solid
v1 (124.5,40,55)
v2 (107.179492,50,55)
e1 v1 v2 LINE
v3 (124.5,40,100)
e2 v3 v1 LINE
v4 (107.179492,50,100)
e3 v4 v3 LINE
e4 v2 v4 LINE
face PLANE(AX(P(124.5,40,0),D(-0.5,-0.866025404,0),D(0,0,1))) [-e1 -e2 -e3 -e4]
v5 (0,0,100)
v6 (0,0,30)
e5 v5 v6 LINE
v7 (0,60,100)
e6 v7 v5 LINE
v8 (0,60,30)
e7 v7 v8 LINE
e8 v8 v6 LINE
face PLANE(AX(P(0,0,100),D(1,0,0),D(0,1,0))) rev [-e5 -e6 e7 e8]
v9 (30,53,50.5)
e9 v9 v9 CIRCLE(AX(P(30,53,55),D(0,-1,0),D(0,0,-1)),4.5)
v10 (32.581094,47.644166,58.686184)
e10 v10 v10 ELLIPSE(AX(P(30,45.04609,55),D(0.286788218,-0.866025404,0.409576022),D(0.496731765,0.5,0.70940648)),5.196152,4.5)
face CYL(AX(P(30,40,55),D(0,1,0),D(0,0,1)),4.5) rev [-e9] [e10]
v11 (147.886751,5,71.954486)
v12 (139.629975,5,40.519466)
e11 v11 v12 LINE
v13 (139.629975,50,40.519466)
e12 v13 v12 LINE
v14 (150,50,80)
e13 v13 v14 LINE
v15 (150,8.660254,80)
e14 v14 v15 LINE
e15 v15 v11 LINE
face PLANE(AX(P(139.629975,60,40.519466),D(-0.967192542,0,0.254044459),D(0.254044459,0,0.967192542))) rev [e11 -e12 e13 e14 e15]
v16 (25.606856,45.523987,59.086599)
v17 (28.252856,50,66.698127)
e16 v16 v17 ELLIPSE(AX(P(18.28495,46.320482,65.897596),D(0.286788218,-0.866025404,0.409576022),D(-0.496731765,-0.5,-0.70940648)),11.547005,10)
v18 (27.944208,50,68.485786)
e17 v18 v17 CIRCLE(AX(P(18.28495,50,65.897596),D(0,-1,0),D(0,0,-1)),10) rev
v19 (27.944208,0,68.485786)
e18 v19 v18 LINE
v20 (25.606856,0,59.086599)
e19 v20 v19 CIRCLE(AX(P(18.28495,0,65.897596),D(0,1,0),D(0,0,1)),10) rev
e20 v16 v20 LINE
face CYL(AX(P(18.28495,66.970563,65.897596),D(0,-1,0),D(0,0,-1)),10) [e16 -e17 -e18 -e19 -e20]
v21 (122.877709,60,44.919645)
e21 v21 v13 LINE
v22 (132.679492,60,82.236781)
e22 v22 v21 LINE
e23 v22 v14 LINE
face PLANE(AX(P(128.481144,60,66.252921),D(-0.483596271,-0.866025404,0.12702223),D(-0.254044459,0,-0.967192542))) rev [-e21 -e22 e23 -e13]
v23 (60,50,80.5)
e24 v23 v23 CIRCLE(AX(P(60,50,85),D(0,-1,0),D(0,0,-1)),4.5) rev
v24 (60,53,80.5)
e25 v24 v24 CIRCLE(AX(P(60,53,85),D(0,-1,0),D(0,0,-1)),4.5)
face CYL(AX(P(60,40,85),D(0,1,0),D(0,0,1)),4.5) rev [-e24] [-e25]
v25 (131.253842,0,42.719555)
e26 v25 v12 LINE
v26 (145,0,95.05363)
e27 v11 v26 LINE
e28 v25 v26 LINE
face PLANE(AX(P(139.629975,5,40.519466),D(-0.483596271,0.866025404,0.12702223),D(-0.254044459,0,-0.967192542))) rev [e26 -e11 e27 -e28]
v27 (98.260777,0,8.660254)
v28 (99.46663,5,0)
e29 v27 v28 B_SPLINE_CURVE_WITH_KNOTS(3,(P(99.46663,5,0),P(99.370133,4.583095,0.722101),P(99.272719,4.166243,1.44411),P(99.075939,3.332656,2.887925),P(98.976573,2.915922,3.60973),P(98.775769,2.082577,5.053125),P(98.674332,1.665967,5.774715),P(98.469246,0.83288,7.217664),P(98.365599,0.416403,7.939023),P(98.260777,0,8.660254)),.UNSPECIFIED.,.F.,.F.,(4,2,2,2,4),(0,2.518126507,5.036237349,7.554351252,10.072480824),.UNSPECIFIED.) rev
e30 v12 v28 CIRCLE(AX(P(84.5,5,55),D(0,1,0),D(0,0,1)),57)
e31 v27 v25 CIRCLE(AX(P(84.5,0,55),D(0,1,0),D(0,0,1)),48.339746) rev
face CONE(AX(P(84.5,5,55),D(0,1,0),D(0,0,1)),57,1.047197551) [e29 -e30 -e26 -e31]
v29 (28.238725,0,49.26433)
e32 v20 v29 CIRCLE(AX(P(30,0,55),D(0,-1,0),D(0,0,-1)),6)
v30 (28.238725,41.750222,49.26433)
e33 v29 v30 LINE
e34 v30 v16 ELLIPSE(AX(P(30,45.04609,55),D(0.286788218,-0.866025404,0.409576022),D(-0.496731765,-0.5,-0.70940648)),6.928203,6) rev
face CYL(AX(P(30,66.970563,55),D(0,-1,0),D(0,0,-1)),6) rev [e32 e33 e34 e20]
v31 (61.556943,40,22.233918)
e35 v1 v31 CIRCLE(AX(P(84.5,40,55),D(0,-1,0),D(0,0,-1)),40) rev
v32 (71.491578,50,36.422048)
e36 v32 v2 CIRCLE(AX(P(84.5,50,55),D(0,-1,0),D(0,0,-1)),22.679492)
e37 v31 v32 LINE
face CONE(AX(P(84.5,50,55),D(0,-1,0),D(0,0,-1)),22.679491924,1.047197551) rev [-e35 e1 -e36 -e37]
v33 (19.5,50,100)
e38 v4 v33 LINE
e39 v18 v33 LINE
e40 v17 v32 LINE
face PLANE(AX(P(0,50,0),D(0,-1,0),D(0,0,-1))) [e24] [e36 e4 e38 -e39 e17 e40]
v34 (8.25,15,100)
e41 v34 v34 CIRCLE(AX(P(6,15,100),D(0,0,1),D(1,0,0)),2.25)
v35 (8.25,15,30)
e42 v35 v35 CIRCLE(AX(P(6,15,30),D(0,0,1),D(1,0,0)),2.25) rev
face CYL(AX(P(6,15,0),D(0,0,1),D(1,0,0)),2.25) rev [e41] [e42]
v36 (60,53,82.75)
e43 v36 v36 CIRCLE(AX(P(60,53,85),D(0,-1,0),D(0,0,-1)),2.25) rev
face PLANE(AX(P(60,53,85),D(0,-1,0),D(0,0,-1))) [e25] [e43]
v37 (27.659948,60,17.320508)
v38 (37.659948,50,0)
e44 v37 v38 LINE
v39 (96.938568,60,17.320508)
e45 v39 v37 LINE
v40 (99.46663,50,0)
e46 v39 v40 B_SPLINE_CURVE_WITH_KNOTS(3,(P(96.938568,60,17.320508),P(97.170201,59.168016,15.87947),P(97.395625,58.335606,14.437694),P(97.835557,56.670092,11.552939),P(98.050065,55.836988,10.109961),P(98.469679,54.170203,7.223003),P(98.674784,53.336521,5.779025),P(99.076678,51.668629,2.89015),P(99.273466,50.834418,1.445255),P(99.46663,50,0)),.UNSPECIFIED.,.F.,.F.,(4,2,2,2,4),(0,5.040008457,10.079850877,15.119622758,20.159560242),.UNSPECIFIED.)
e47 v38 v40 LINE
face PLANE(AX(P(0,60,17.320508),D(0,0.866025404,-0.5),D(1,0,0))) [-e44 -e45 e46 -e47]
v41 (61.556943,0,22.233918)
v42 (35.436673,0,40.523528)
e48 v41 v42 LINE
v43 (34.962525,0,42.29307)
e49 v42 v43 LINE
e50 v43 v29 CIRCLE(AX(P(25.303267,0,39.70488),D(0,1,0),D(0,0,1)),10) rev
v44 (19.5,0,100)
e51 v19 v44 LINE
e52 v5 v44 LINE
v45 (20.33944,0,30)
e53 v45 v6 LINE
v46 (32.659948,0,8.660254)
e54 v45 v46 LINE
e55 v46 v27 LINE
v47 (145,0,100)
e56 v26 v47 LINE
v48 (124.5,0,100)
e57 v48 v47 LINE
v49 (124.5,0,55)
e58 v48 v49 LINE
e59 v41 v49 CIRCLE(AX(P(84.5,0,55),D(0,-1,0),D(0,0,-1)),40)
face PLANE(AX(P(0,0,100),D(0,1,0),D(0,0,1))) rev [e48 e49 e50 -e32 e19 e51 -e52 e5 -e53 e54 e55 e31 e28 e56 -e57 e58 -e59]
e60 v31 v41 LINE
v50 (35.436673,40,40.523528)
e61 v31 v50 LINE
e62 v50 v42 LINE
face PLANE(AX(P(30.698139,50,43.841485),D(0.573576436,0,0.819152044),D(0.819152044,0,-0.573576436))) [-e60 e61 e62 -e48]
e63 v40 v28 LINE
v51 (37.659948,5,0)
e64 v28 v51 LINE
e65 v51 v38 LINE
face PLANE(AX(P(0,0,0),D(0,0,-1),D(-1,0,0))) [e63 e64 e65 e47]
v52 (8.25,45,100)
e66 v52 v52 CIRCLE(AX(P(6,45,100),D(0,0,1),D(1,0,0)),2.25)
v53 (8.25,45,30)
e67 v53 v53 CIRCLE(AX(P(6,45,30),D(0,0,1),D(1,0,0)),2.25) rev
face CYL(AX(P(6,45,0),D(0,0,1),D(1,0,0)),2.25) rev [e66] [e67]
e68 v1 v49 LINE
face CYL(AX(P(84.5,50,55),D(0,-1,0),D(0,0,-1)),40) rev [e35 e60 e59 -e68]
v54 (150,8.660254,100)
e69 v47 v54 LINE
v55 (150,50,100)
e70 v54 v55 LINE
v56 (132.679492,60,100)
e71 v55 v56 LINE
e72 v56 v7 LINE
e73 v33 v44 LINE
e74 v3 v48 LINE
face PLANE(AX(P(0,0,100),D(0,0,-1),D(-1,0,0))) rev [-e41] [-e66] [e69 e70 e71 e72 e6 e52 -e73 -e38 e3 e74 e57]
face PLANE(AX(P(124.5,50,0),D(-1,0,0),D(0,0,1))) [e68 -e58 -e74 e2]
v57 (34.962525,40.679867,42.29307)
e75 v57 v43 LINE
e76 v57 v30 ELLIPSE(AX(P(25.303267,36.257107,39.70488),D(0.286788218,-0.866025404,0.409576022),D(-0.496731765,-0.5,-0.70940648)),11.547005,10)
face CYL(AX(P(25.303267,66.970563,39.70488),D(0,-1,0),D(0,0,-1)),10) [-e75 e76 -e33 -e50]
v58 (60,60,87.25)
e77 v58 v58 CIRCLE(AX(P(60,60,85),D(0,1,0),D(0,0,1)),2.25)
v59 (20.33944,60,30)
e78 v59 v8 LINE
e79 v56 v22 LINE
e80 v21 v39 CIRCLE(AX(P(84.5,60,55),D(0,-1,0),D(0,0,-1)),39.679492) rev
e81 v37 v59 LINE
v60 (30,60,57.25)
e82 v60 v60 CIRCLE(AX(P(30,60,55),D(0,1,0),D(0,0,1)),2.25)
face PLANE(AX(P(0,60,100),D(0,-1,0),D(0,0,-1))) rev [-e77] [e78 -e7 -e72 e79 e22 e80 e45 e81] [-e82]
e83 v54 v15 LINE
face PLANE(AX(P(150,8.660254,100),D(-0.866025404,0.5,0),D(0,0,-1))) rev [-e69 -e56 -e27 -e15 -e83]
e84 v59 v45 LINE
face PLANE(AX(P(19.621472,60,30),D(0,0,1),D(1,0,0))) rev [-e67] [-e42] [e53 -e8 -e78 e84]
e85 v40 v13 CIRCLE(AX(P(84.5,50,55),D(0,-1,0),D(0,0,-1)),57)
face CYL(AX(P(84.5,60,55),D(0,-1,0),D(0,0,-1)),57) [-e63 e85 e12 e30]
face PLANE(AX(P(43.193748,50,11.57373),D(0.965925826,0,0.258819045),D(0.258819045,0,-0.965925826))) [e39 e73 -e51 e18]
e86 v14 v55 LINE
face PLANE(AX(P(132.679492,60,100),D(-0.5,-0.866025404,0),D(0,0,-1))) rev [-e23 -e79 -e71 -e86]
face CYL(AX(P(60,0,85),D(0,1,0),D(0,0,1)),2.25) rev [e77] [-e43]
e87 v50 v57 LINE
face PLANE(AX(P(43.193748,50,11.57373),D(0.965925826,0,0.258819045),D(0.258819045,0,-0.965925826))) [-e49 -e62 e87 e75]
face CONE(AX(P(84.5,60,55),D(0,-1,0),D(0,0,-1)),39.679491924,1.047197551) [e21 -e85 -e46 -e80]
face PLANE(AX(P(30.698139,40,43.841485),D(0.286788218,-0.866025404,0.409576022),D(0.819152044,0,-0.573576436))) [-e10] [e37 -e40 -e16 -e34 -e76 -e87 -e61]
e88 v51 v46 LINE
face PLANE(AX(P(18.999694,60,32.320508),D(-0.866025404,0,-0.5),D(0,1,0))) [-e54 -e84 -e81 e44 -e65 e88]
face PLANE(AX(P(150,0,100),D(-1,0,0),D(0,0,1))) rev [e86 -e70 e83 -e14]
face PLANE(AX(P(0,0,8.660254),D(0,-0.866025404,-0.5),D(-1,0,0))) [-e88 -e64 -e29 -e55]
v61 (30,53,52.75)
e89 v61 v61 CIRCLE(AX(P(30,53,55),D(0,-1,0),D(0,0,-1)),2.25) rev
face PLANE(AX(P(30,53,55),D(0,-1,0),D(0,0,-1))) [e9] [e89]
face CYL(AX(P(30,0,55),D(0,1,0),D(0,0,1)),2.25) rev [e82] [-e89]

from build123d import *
from OCP.BRepFilletAPI import BRepFilletAPI_MakeChamfer

# Parameters (mm, degrees)
SKETCH_1_W                = 150
SKETCH_1_H                = 60
EXTRUDE_1_DEPTH           = 100
SKETCH_5_R                = 2.25
CUT_EXTRUDE_5_DEPTH       = 191
CUT_EXTRUDE_7_DEPTH       = 50
CUT_EXTRUDE_8_DEPTH       = 191
SKETCH_10_R               = 2.25
CUT_EXTRUDE_9_DEPTH       = 191
SKETCH_11_R               = 6
CUT_EXTRUDE_10_DEPTH      = 50
FILLET_1_R                = 10
CHAMFER_2_SIZE            = 10
CHAMFER_2_SIZE_2          = 17.320508076
CHAMFER_4_SIZE            = 5
CHAMFER_4_SIZE2           = 8.660254038
CUT_EXTRUDE_11_DEPTH      = 10
CUT_EXTRUDE_11_DEPTH_BACK = 3
SKETCH_12_R               = 4.5


with BuildPart() as part:
    # 草图1 → 凸台-拉伸1 (new body)
    with BuildSketch(Plane.XY):
        with Locations((75, 30)):
            Rectangle(SKETCH_1_W, SKETCH_1_H)
    extrude(amount=EXTRUDE_1_DEPTH)

    # 草图5 → 切除-拉伸5 (cut, through all)
    with BuildSketch(Plane.XY.offset(100)):
        with Locations((6, 45)):
            Circle(SKETCH_5_R)
        with Locations((6, 15)):
            Circle(SKETCH_5_R)
    extrude(amount=-CUT_EXTRUDE_5_DEPTH, mode=Mode.SUBTRACT)

    # 草图8 → 切除-拉伸7 (cut)
    with BuildSketch(Plane.XZ):
        with BuildLine():
            Line((124.5, 55), (124.5, 100))
            Line((124.5, 100), (19.5, 100))
            Line((19.5, 100), (35.436672603, 40.523528143))
            Line((35.436672603, 40.523528143), (61.556942546, 22.233918228))
            ThreePointArc((61.556942546, 22.233918228), (102.969944529, 19.519566673), (124.5, 55))
        make_face()
    extrude(amount=-CUT_EXTRUDE_7_DEPTH, mode=Mode.SUBTRACT)

    # 草图9 → 切除-拉伸8 (cut, through all)
    with BuildSketch(Plane.XZ):
        with BuildLine():
            Line((150, 80), (150, 0))
            Line((150, 0), (99.466629547, 0))
            ThreePointArc((99.466629547, 0), (124.98259213, 14.873204284), (139.629974877, 40.519465822))
            Line((139.629974877, 40.519465822), (150, 80))
        make_face()
        Polygon((19.621472223, 30), (27.659947996, 0), (0, 0), (0, 30), align=None)
    extrude(amount=-CUT_EXTRUDE_8_DEPTH, mode=Mode.SUBTRACT)

    # 草图10 → 切除-拉伸9 (cut, through all)
    with BuildSketch(Plane(origin=(0, 60, 0), x_dir=(1, 0, 0), z_dir=(0, 1, 0))):
        with Locations(Location((30, -55, 0), (0, 0, 270))):
            Circle(SKETCH_10_R)
        with Locations(Location((60, -85, 0), (0, 0, 270))):
            Circle(SKETCH_10_R)
    extrude(amount=-CUT_EXTRUDE_9_DEPTH, mode=Mode.SUBTRACT)

    # 草图11 → 切除-拉伸10 (cut)
    with BuildSketch(Plane.XZ):
        with Locations((30, 55)):
            Circle(SKETCH_11_R)
    extrude(amount=-CUT_EXTRUDE_10_DEPTH, mode=Mode.SUBTRACT)

    # 圆角1
    fillet_1_edges = [part.edges().sort_by_distance(p)[0] for p in [
        (32.956659097, 25, 49.779064549),
        (29.950074163, 25, 60.999792281),
    ]]
    fillet(fillet_1_edges, radius=FILLET_1_R)

    # 倒角2
    # the kernel refuses this chamfer: 17.320508076, 10 mm, written as the material it adds along each edge
    with BuildSketch(Plane(origin=(-1.269235366, 50, 66.225281599), x_dir=(-0.0332065552835215, -0.9983227437537926, -0.04742387573893358), z_dir=(0.8191520442889948, 0, -0.5735764363510419))) as chamfer_2_piece_1_section:
        Polygon((CHAMFER_2_SIZE * 0.998322743754, -CHAMFER_2_SIZE * 0.0578938624027), (-CHAMFER_2_SIZE_2 * 0.0578938624016, -CHAMFER_2_SIZE_2 * 0.998322743736), (0, 0), align=None)
    chamfer_2_piece_1 = extrude(amount=76.696601504, mode=Mode.PRIVATE)
    chamfer_2_piece_1 = split(chamfer_2_piece_1, bisect_by=Plane(origin=(0, 46.853516386, 53.66836115), z_dir=(1, 0, 0)), keep=Keep.TOP, mode=Mode.PRIVATE)
    chamfer_2_piece_1 = chamfer_2_piece_1 - Plane(origin=(6, 45, 53.66836115), x_dir=(1, 0, 0), z_dir=(0, 0, 1)) * Cylinder(2.25, 223, mode=Mode.PRIVATE)
    chamfer_2_piece_1 = chamfer_2_piece_1 - Plane(origin=(30, 46.853516386, 55), x_dir=(0, 0, 1), z_dir=(0, 1, 0)) * Cylinder(2.25, 223, mode=Mode.PRIVATE)
    add(chamfer_2_piece_1)
    with BuildSketch(Plane(origin=(124.5, 50, 55), x_dir=(0.05789386240267183, -0.9983227437537926, 0), z_dir=(0, 0, 1))) as chamfer_2_piece_2:
        Polygon((CHAMFER_2_SIZE * 0.998322743754, -CHAMFER_2_SIZE * 0.0578938624027), (-CHAMFER_2_SIZE_2 * 0.0578938624016, -CHAMFER_2_SIZE_2 * 0.998322743736), (0, 0), align=None)
    extrude(amount=45)
    with BuildSketch(Plane(origin=(84.5, 50, 55), x_dir=(-0.5735764363510413, 0, -0.8191520442889951), z_dir=(-0.8191520442889951, 0, 0.5735764363510413))) as chamfer_2_piece_3:
        Polygon((40, CHAMFER_2_SIZE), (40 - CHAMFER_2_SIZE_2, 0), (40, 0), align=None)
    revolve(axis=Axis((84.5, 50, 55), (0, -1, 0)), revolution_arc=125)

    # 倒角3
    # the kernel refuses this chamfer: 33.46065215, 17.320508076, 10 mm, written as the material it takes off along each edge
    with BuildSketch(Plane(origin=(27.659947996, -34.755198876, 0), x_dir=(-0.2684337130154822, 0, 0.9632981582649901), z_dir=(0, 1, 0))) as chamfer_3_piece_1_section:
        with BuildLine():
            Line((34.755198876, 0), (-3.980545955, 9.966488807))
            Line((-3.980545955, 9.966488807), (-4.625197647, 9.786849465))
            ThreePointArc((-4.625197647, 9.786849465), (-2.076639928, 4.959177295), (-0.644651692, -0.179639342))
            Line((-0.644651692, -0.179639342), (0.006670144, -0.669179801))
            ThreePointArc((0.006670144, -0.669179801), (17.382543222, -0.495983324), (34.76186902, -0.669179801))
            Line((34.76186902, -0.669179801), (34.755198876, 0))
        make_face()
    chamfer_3_piece_1 = extrude(amount=129.510397752, mode=Mode.PRIVATE)
    chamfer_3_piece_1 = split(chamfer_3_piece_1, bisect_by=Plane(origin=(27.837157989, 30, 30), z_dir=(0, 0, -1)), keep=Keep.TOP, mode=Mode.PRIVATE)
    add(chamfer_3_piece_1, mode=Mode.SUBTRACT)
    with BuildSketch(Plane(origin=(139.629974877, 60, 40.519465822), x_dir=(0.05599451192610632, -0.9983227437537928, -0.014707614968315207), z_dir=(0.2540444592557946, 0, 0.9671925417006848))) as chamfer_3_piece_2:
        with BuildLine():
            Line((10.363792898, 0), (-1.383316572, -17.870395769))
            Line((-1.383316572, -17.870395769), (-1.729145715, -17.850340747))
            ThreePointArc((-1.729145715, -17.850340747), (-0.864572857, -8.925170374), (-0.345829143, 0.020055022))
            Line((-0.345829143, 0.020055022), (0.020055022, 0.345829143))
            ThreePointArc((0.020055022, 0.345829143), (5.184583312, 0.04633232), (10.38384792, 0.345829143))
            Line((10.38384792, 0.345829143), (10.363792898, 0))
        make_face()
    extrude(amount=58.743581506, mode=Mode.SUBTRACT)
    with BuildSketch(Plane(origin=(84.5, 60, 55), x_dir=(-0.0488032324708506, 0, -0.9988084123095861), z_dir=(-0.9988084123095861, 0, 0.0488032324708506))) as chamfer_3_piece_3:
        with BuildLine():
            Line((57.6, 10.346410162), (39.079491924, -0.346410162))
            Line((39.079491924, -0.346410162), (39.079491924, -0.692820323))
            ThreePointArc((39.079491924, -0.692820323), (48.039745962, -0.346410162), (57, -0.346410162))
            Line((57, -0.346410162), (57.346410162, 0))
            ThreePointArc((57.346410162, 0), (57.346410162, 5.173205081), (57.946410162, 10.346410162))
            Line((57.946410162, 10.346410162), (57.6, 10.346410162))
        make_face()
    revolve(axis=Axis((84.5, 60, 55), (0, -1, 0)), revolution_arc=78.080358164, mode=Mode.SUBTRACT)
    with BuildSketch(Plane(origin=(150, 60, 62.076144118), x_dir=(0.057893862402670464, -0.9983227437537926, 0), z_dir=(0, 0, 1))) as chamfer_3_piece_4:
        with BuildLine():
            Line((10.363792898, 0), (-1.383316572, -17.870395769))
            Line((-1.383316572, -17.870395769), (-1.729145715, -17.850340747))
            ThreePointArc((-1.729145715, -17.850340747), (-0.864572857, -8.925170374), (-0.345829143, 0.020055022))
            Line((-0.345829143, 0.020055022), (0.020055022, 0.345829143))
            ThreePointArc((0.020055022, 0.345829143), (5.184583312, 0.04633232), (10.38384792, 0.345829143))
            Line((10.38384792, 0.345829143), (10.363792898, 0))
        make_face()
    extrude(amount=55.847711765, mode=Mode.SUBTRACT)
    # the kernel refuses this chamfer: 33.46065215, 17.320508076, 10 mm, written as the material it takes off along each edge
    with BuildSketch(Plane(origin=(99.736475847, 60, 0), x_dir=(0, -0.9983227437537926, -0.05789386240267141), z_dir=(-1, 0, 0))) as chamfer_3_2_piece_1:
        with BuildLine():
            Line((10.363792898, 0), (-1.383316572, 17.870395769))
            Line((-1.383316572, 17.870395769), (-1.729145715, 17.850340747))
            ThreePointArc((-1.729145715, 17.850340747), (-0.864572857, 8.925170374), (-0.345829143, -0.020055022))
            Line((-0.345829143, -0.020055022), (0.020055022, -0.345829143))
            ThreePointArc((0.020055022, -0.345829143), (5.184583312, -0.04633232), (10.38384792, -0.345829143))
            Line((10.38384792, -0.345829143), (10.363792898, 0))
        make_face()
    extrude(amount=80.000383734, mode=Mode.SUBTRACT)

    # 倒角4: one chamfer whose edges measure the first distance from different faces: ONE call of the kernel's chamfer builder (chamfer() names one face for all edges)
    chamfer_4_edges_1 = [part.edges().sort_by_distance(p)[0] for p in [
        (68.563288771, 0, 0),
    ]]
    chamfer_4_side_1 = [part.faces().sort_by_distance(p)[0] for p in [
        (68.563288771, 25, 0),
    ]]
    chamfer_4_edges_2 = [part.edges().sort_by_distance(p)[0] for p in [
        (124.98259213, 0, 14.873204284),
    ]]
    chamfer_4_side_2 = [part.faces().sort_by_distance(p)[0] for p in [
        (124.98259213, 25, 14.873204284),
    ]]
    chamfer_4_edges_3 = [part.edges().sort_by_distance(p)[0] for p in [
        (144.814987438, 0, 60.259732911),
    ]]
    chamfer_4_side_3 = [part.faces().sort_by_distance(p)[0] for p in [
        (144.814987438, 25, 60.259732911),
    ]]
    chamfer_4_edges_4 = [part.edges().sort_by_distance(p)[0] for p in [
        (150, 0, 90),
    ]]
    chamfer_4_side_4 = [part.faces().sort_by_distance(p)[0] for p in [
        (31.203351809, 0, 45.395528881),
    ]]
    chamfer_4 = BRepFilletAPI_MakeChamfer(part.part.solid().wrapped)
    for e in chamfer_4_edges_1:
        chamfer_4.Add(CHAMFER_4_SIZE, CHAMFER_4_SIZE2, e.wrapped, chamfer_4_side_1[0].wrapped)  # the first distance lies on this face
    for e in chamfer_4_edges_2:
        chamfer_4.Add(CHAMFER_4_SIZE, CHAMFER_4_SIZE2, e.wrapped, chamfer_4_side_2[0].wrapped)  # the first distance lies on this face
    for e in chamfer_4_edges_3:
        chamfer_4.Add(CHAMFER_4_SIZE, CHAMFER_4_SIZE2, e.wrapped, chamfer_4_side_3[0].wrapped)  # the first distance lies on this face
    for e in chamfer_4_edges_4:
        chamfer_4.Add(CHAMFER_4_SIZE, CHAMFER_4_SIZE2, e.wrapped, chamfer_4_side_4[0].wrapped)  # the first distance lies on this face
    add(Compound.cast(chamfer_4.Shape()), mode=Mode.REPLACE)

    # 草图12 → 切除-拉伸11 (cut, two sides: drawn at the far end of the back side and taken through both)
    with BuildSketch(Plane.XZ.offset(-50).offset(-CUT_EXTRUDE_11_DEPTH_BACK)):
        with Locations(Location((30, 55, 0), (0, 0, 55))):
            Circle(SKETCH_12_R)
        with Locations(Location((60, 85, 0), (0, 0, 270))):
            Circle(SKETCH_12_R)
    extrude(amount=CUT_EXTRUDE_11_DEPTH + CUT_EXTRUDE_11_DEPTH_BACK, mode=Mode.SUBTRACT)


solid = part.part
